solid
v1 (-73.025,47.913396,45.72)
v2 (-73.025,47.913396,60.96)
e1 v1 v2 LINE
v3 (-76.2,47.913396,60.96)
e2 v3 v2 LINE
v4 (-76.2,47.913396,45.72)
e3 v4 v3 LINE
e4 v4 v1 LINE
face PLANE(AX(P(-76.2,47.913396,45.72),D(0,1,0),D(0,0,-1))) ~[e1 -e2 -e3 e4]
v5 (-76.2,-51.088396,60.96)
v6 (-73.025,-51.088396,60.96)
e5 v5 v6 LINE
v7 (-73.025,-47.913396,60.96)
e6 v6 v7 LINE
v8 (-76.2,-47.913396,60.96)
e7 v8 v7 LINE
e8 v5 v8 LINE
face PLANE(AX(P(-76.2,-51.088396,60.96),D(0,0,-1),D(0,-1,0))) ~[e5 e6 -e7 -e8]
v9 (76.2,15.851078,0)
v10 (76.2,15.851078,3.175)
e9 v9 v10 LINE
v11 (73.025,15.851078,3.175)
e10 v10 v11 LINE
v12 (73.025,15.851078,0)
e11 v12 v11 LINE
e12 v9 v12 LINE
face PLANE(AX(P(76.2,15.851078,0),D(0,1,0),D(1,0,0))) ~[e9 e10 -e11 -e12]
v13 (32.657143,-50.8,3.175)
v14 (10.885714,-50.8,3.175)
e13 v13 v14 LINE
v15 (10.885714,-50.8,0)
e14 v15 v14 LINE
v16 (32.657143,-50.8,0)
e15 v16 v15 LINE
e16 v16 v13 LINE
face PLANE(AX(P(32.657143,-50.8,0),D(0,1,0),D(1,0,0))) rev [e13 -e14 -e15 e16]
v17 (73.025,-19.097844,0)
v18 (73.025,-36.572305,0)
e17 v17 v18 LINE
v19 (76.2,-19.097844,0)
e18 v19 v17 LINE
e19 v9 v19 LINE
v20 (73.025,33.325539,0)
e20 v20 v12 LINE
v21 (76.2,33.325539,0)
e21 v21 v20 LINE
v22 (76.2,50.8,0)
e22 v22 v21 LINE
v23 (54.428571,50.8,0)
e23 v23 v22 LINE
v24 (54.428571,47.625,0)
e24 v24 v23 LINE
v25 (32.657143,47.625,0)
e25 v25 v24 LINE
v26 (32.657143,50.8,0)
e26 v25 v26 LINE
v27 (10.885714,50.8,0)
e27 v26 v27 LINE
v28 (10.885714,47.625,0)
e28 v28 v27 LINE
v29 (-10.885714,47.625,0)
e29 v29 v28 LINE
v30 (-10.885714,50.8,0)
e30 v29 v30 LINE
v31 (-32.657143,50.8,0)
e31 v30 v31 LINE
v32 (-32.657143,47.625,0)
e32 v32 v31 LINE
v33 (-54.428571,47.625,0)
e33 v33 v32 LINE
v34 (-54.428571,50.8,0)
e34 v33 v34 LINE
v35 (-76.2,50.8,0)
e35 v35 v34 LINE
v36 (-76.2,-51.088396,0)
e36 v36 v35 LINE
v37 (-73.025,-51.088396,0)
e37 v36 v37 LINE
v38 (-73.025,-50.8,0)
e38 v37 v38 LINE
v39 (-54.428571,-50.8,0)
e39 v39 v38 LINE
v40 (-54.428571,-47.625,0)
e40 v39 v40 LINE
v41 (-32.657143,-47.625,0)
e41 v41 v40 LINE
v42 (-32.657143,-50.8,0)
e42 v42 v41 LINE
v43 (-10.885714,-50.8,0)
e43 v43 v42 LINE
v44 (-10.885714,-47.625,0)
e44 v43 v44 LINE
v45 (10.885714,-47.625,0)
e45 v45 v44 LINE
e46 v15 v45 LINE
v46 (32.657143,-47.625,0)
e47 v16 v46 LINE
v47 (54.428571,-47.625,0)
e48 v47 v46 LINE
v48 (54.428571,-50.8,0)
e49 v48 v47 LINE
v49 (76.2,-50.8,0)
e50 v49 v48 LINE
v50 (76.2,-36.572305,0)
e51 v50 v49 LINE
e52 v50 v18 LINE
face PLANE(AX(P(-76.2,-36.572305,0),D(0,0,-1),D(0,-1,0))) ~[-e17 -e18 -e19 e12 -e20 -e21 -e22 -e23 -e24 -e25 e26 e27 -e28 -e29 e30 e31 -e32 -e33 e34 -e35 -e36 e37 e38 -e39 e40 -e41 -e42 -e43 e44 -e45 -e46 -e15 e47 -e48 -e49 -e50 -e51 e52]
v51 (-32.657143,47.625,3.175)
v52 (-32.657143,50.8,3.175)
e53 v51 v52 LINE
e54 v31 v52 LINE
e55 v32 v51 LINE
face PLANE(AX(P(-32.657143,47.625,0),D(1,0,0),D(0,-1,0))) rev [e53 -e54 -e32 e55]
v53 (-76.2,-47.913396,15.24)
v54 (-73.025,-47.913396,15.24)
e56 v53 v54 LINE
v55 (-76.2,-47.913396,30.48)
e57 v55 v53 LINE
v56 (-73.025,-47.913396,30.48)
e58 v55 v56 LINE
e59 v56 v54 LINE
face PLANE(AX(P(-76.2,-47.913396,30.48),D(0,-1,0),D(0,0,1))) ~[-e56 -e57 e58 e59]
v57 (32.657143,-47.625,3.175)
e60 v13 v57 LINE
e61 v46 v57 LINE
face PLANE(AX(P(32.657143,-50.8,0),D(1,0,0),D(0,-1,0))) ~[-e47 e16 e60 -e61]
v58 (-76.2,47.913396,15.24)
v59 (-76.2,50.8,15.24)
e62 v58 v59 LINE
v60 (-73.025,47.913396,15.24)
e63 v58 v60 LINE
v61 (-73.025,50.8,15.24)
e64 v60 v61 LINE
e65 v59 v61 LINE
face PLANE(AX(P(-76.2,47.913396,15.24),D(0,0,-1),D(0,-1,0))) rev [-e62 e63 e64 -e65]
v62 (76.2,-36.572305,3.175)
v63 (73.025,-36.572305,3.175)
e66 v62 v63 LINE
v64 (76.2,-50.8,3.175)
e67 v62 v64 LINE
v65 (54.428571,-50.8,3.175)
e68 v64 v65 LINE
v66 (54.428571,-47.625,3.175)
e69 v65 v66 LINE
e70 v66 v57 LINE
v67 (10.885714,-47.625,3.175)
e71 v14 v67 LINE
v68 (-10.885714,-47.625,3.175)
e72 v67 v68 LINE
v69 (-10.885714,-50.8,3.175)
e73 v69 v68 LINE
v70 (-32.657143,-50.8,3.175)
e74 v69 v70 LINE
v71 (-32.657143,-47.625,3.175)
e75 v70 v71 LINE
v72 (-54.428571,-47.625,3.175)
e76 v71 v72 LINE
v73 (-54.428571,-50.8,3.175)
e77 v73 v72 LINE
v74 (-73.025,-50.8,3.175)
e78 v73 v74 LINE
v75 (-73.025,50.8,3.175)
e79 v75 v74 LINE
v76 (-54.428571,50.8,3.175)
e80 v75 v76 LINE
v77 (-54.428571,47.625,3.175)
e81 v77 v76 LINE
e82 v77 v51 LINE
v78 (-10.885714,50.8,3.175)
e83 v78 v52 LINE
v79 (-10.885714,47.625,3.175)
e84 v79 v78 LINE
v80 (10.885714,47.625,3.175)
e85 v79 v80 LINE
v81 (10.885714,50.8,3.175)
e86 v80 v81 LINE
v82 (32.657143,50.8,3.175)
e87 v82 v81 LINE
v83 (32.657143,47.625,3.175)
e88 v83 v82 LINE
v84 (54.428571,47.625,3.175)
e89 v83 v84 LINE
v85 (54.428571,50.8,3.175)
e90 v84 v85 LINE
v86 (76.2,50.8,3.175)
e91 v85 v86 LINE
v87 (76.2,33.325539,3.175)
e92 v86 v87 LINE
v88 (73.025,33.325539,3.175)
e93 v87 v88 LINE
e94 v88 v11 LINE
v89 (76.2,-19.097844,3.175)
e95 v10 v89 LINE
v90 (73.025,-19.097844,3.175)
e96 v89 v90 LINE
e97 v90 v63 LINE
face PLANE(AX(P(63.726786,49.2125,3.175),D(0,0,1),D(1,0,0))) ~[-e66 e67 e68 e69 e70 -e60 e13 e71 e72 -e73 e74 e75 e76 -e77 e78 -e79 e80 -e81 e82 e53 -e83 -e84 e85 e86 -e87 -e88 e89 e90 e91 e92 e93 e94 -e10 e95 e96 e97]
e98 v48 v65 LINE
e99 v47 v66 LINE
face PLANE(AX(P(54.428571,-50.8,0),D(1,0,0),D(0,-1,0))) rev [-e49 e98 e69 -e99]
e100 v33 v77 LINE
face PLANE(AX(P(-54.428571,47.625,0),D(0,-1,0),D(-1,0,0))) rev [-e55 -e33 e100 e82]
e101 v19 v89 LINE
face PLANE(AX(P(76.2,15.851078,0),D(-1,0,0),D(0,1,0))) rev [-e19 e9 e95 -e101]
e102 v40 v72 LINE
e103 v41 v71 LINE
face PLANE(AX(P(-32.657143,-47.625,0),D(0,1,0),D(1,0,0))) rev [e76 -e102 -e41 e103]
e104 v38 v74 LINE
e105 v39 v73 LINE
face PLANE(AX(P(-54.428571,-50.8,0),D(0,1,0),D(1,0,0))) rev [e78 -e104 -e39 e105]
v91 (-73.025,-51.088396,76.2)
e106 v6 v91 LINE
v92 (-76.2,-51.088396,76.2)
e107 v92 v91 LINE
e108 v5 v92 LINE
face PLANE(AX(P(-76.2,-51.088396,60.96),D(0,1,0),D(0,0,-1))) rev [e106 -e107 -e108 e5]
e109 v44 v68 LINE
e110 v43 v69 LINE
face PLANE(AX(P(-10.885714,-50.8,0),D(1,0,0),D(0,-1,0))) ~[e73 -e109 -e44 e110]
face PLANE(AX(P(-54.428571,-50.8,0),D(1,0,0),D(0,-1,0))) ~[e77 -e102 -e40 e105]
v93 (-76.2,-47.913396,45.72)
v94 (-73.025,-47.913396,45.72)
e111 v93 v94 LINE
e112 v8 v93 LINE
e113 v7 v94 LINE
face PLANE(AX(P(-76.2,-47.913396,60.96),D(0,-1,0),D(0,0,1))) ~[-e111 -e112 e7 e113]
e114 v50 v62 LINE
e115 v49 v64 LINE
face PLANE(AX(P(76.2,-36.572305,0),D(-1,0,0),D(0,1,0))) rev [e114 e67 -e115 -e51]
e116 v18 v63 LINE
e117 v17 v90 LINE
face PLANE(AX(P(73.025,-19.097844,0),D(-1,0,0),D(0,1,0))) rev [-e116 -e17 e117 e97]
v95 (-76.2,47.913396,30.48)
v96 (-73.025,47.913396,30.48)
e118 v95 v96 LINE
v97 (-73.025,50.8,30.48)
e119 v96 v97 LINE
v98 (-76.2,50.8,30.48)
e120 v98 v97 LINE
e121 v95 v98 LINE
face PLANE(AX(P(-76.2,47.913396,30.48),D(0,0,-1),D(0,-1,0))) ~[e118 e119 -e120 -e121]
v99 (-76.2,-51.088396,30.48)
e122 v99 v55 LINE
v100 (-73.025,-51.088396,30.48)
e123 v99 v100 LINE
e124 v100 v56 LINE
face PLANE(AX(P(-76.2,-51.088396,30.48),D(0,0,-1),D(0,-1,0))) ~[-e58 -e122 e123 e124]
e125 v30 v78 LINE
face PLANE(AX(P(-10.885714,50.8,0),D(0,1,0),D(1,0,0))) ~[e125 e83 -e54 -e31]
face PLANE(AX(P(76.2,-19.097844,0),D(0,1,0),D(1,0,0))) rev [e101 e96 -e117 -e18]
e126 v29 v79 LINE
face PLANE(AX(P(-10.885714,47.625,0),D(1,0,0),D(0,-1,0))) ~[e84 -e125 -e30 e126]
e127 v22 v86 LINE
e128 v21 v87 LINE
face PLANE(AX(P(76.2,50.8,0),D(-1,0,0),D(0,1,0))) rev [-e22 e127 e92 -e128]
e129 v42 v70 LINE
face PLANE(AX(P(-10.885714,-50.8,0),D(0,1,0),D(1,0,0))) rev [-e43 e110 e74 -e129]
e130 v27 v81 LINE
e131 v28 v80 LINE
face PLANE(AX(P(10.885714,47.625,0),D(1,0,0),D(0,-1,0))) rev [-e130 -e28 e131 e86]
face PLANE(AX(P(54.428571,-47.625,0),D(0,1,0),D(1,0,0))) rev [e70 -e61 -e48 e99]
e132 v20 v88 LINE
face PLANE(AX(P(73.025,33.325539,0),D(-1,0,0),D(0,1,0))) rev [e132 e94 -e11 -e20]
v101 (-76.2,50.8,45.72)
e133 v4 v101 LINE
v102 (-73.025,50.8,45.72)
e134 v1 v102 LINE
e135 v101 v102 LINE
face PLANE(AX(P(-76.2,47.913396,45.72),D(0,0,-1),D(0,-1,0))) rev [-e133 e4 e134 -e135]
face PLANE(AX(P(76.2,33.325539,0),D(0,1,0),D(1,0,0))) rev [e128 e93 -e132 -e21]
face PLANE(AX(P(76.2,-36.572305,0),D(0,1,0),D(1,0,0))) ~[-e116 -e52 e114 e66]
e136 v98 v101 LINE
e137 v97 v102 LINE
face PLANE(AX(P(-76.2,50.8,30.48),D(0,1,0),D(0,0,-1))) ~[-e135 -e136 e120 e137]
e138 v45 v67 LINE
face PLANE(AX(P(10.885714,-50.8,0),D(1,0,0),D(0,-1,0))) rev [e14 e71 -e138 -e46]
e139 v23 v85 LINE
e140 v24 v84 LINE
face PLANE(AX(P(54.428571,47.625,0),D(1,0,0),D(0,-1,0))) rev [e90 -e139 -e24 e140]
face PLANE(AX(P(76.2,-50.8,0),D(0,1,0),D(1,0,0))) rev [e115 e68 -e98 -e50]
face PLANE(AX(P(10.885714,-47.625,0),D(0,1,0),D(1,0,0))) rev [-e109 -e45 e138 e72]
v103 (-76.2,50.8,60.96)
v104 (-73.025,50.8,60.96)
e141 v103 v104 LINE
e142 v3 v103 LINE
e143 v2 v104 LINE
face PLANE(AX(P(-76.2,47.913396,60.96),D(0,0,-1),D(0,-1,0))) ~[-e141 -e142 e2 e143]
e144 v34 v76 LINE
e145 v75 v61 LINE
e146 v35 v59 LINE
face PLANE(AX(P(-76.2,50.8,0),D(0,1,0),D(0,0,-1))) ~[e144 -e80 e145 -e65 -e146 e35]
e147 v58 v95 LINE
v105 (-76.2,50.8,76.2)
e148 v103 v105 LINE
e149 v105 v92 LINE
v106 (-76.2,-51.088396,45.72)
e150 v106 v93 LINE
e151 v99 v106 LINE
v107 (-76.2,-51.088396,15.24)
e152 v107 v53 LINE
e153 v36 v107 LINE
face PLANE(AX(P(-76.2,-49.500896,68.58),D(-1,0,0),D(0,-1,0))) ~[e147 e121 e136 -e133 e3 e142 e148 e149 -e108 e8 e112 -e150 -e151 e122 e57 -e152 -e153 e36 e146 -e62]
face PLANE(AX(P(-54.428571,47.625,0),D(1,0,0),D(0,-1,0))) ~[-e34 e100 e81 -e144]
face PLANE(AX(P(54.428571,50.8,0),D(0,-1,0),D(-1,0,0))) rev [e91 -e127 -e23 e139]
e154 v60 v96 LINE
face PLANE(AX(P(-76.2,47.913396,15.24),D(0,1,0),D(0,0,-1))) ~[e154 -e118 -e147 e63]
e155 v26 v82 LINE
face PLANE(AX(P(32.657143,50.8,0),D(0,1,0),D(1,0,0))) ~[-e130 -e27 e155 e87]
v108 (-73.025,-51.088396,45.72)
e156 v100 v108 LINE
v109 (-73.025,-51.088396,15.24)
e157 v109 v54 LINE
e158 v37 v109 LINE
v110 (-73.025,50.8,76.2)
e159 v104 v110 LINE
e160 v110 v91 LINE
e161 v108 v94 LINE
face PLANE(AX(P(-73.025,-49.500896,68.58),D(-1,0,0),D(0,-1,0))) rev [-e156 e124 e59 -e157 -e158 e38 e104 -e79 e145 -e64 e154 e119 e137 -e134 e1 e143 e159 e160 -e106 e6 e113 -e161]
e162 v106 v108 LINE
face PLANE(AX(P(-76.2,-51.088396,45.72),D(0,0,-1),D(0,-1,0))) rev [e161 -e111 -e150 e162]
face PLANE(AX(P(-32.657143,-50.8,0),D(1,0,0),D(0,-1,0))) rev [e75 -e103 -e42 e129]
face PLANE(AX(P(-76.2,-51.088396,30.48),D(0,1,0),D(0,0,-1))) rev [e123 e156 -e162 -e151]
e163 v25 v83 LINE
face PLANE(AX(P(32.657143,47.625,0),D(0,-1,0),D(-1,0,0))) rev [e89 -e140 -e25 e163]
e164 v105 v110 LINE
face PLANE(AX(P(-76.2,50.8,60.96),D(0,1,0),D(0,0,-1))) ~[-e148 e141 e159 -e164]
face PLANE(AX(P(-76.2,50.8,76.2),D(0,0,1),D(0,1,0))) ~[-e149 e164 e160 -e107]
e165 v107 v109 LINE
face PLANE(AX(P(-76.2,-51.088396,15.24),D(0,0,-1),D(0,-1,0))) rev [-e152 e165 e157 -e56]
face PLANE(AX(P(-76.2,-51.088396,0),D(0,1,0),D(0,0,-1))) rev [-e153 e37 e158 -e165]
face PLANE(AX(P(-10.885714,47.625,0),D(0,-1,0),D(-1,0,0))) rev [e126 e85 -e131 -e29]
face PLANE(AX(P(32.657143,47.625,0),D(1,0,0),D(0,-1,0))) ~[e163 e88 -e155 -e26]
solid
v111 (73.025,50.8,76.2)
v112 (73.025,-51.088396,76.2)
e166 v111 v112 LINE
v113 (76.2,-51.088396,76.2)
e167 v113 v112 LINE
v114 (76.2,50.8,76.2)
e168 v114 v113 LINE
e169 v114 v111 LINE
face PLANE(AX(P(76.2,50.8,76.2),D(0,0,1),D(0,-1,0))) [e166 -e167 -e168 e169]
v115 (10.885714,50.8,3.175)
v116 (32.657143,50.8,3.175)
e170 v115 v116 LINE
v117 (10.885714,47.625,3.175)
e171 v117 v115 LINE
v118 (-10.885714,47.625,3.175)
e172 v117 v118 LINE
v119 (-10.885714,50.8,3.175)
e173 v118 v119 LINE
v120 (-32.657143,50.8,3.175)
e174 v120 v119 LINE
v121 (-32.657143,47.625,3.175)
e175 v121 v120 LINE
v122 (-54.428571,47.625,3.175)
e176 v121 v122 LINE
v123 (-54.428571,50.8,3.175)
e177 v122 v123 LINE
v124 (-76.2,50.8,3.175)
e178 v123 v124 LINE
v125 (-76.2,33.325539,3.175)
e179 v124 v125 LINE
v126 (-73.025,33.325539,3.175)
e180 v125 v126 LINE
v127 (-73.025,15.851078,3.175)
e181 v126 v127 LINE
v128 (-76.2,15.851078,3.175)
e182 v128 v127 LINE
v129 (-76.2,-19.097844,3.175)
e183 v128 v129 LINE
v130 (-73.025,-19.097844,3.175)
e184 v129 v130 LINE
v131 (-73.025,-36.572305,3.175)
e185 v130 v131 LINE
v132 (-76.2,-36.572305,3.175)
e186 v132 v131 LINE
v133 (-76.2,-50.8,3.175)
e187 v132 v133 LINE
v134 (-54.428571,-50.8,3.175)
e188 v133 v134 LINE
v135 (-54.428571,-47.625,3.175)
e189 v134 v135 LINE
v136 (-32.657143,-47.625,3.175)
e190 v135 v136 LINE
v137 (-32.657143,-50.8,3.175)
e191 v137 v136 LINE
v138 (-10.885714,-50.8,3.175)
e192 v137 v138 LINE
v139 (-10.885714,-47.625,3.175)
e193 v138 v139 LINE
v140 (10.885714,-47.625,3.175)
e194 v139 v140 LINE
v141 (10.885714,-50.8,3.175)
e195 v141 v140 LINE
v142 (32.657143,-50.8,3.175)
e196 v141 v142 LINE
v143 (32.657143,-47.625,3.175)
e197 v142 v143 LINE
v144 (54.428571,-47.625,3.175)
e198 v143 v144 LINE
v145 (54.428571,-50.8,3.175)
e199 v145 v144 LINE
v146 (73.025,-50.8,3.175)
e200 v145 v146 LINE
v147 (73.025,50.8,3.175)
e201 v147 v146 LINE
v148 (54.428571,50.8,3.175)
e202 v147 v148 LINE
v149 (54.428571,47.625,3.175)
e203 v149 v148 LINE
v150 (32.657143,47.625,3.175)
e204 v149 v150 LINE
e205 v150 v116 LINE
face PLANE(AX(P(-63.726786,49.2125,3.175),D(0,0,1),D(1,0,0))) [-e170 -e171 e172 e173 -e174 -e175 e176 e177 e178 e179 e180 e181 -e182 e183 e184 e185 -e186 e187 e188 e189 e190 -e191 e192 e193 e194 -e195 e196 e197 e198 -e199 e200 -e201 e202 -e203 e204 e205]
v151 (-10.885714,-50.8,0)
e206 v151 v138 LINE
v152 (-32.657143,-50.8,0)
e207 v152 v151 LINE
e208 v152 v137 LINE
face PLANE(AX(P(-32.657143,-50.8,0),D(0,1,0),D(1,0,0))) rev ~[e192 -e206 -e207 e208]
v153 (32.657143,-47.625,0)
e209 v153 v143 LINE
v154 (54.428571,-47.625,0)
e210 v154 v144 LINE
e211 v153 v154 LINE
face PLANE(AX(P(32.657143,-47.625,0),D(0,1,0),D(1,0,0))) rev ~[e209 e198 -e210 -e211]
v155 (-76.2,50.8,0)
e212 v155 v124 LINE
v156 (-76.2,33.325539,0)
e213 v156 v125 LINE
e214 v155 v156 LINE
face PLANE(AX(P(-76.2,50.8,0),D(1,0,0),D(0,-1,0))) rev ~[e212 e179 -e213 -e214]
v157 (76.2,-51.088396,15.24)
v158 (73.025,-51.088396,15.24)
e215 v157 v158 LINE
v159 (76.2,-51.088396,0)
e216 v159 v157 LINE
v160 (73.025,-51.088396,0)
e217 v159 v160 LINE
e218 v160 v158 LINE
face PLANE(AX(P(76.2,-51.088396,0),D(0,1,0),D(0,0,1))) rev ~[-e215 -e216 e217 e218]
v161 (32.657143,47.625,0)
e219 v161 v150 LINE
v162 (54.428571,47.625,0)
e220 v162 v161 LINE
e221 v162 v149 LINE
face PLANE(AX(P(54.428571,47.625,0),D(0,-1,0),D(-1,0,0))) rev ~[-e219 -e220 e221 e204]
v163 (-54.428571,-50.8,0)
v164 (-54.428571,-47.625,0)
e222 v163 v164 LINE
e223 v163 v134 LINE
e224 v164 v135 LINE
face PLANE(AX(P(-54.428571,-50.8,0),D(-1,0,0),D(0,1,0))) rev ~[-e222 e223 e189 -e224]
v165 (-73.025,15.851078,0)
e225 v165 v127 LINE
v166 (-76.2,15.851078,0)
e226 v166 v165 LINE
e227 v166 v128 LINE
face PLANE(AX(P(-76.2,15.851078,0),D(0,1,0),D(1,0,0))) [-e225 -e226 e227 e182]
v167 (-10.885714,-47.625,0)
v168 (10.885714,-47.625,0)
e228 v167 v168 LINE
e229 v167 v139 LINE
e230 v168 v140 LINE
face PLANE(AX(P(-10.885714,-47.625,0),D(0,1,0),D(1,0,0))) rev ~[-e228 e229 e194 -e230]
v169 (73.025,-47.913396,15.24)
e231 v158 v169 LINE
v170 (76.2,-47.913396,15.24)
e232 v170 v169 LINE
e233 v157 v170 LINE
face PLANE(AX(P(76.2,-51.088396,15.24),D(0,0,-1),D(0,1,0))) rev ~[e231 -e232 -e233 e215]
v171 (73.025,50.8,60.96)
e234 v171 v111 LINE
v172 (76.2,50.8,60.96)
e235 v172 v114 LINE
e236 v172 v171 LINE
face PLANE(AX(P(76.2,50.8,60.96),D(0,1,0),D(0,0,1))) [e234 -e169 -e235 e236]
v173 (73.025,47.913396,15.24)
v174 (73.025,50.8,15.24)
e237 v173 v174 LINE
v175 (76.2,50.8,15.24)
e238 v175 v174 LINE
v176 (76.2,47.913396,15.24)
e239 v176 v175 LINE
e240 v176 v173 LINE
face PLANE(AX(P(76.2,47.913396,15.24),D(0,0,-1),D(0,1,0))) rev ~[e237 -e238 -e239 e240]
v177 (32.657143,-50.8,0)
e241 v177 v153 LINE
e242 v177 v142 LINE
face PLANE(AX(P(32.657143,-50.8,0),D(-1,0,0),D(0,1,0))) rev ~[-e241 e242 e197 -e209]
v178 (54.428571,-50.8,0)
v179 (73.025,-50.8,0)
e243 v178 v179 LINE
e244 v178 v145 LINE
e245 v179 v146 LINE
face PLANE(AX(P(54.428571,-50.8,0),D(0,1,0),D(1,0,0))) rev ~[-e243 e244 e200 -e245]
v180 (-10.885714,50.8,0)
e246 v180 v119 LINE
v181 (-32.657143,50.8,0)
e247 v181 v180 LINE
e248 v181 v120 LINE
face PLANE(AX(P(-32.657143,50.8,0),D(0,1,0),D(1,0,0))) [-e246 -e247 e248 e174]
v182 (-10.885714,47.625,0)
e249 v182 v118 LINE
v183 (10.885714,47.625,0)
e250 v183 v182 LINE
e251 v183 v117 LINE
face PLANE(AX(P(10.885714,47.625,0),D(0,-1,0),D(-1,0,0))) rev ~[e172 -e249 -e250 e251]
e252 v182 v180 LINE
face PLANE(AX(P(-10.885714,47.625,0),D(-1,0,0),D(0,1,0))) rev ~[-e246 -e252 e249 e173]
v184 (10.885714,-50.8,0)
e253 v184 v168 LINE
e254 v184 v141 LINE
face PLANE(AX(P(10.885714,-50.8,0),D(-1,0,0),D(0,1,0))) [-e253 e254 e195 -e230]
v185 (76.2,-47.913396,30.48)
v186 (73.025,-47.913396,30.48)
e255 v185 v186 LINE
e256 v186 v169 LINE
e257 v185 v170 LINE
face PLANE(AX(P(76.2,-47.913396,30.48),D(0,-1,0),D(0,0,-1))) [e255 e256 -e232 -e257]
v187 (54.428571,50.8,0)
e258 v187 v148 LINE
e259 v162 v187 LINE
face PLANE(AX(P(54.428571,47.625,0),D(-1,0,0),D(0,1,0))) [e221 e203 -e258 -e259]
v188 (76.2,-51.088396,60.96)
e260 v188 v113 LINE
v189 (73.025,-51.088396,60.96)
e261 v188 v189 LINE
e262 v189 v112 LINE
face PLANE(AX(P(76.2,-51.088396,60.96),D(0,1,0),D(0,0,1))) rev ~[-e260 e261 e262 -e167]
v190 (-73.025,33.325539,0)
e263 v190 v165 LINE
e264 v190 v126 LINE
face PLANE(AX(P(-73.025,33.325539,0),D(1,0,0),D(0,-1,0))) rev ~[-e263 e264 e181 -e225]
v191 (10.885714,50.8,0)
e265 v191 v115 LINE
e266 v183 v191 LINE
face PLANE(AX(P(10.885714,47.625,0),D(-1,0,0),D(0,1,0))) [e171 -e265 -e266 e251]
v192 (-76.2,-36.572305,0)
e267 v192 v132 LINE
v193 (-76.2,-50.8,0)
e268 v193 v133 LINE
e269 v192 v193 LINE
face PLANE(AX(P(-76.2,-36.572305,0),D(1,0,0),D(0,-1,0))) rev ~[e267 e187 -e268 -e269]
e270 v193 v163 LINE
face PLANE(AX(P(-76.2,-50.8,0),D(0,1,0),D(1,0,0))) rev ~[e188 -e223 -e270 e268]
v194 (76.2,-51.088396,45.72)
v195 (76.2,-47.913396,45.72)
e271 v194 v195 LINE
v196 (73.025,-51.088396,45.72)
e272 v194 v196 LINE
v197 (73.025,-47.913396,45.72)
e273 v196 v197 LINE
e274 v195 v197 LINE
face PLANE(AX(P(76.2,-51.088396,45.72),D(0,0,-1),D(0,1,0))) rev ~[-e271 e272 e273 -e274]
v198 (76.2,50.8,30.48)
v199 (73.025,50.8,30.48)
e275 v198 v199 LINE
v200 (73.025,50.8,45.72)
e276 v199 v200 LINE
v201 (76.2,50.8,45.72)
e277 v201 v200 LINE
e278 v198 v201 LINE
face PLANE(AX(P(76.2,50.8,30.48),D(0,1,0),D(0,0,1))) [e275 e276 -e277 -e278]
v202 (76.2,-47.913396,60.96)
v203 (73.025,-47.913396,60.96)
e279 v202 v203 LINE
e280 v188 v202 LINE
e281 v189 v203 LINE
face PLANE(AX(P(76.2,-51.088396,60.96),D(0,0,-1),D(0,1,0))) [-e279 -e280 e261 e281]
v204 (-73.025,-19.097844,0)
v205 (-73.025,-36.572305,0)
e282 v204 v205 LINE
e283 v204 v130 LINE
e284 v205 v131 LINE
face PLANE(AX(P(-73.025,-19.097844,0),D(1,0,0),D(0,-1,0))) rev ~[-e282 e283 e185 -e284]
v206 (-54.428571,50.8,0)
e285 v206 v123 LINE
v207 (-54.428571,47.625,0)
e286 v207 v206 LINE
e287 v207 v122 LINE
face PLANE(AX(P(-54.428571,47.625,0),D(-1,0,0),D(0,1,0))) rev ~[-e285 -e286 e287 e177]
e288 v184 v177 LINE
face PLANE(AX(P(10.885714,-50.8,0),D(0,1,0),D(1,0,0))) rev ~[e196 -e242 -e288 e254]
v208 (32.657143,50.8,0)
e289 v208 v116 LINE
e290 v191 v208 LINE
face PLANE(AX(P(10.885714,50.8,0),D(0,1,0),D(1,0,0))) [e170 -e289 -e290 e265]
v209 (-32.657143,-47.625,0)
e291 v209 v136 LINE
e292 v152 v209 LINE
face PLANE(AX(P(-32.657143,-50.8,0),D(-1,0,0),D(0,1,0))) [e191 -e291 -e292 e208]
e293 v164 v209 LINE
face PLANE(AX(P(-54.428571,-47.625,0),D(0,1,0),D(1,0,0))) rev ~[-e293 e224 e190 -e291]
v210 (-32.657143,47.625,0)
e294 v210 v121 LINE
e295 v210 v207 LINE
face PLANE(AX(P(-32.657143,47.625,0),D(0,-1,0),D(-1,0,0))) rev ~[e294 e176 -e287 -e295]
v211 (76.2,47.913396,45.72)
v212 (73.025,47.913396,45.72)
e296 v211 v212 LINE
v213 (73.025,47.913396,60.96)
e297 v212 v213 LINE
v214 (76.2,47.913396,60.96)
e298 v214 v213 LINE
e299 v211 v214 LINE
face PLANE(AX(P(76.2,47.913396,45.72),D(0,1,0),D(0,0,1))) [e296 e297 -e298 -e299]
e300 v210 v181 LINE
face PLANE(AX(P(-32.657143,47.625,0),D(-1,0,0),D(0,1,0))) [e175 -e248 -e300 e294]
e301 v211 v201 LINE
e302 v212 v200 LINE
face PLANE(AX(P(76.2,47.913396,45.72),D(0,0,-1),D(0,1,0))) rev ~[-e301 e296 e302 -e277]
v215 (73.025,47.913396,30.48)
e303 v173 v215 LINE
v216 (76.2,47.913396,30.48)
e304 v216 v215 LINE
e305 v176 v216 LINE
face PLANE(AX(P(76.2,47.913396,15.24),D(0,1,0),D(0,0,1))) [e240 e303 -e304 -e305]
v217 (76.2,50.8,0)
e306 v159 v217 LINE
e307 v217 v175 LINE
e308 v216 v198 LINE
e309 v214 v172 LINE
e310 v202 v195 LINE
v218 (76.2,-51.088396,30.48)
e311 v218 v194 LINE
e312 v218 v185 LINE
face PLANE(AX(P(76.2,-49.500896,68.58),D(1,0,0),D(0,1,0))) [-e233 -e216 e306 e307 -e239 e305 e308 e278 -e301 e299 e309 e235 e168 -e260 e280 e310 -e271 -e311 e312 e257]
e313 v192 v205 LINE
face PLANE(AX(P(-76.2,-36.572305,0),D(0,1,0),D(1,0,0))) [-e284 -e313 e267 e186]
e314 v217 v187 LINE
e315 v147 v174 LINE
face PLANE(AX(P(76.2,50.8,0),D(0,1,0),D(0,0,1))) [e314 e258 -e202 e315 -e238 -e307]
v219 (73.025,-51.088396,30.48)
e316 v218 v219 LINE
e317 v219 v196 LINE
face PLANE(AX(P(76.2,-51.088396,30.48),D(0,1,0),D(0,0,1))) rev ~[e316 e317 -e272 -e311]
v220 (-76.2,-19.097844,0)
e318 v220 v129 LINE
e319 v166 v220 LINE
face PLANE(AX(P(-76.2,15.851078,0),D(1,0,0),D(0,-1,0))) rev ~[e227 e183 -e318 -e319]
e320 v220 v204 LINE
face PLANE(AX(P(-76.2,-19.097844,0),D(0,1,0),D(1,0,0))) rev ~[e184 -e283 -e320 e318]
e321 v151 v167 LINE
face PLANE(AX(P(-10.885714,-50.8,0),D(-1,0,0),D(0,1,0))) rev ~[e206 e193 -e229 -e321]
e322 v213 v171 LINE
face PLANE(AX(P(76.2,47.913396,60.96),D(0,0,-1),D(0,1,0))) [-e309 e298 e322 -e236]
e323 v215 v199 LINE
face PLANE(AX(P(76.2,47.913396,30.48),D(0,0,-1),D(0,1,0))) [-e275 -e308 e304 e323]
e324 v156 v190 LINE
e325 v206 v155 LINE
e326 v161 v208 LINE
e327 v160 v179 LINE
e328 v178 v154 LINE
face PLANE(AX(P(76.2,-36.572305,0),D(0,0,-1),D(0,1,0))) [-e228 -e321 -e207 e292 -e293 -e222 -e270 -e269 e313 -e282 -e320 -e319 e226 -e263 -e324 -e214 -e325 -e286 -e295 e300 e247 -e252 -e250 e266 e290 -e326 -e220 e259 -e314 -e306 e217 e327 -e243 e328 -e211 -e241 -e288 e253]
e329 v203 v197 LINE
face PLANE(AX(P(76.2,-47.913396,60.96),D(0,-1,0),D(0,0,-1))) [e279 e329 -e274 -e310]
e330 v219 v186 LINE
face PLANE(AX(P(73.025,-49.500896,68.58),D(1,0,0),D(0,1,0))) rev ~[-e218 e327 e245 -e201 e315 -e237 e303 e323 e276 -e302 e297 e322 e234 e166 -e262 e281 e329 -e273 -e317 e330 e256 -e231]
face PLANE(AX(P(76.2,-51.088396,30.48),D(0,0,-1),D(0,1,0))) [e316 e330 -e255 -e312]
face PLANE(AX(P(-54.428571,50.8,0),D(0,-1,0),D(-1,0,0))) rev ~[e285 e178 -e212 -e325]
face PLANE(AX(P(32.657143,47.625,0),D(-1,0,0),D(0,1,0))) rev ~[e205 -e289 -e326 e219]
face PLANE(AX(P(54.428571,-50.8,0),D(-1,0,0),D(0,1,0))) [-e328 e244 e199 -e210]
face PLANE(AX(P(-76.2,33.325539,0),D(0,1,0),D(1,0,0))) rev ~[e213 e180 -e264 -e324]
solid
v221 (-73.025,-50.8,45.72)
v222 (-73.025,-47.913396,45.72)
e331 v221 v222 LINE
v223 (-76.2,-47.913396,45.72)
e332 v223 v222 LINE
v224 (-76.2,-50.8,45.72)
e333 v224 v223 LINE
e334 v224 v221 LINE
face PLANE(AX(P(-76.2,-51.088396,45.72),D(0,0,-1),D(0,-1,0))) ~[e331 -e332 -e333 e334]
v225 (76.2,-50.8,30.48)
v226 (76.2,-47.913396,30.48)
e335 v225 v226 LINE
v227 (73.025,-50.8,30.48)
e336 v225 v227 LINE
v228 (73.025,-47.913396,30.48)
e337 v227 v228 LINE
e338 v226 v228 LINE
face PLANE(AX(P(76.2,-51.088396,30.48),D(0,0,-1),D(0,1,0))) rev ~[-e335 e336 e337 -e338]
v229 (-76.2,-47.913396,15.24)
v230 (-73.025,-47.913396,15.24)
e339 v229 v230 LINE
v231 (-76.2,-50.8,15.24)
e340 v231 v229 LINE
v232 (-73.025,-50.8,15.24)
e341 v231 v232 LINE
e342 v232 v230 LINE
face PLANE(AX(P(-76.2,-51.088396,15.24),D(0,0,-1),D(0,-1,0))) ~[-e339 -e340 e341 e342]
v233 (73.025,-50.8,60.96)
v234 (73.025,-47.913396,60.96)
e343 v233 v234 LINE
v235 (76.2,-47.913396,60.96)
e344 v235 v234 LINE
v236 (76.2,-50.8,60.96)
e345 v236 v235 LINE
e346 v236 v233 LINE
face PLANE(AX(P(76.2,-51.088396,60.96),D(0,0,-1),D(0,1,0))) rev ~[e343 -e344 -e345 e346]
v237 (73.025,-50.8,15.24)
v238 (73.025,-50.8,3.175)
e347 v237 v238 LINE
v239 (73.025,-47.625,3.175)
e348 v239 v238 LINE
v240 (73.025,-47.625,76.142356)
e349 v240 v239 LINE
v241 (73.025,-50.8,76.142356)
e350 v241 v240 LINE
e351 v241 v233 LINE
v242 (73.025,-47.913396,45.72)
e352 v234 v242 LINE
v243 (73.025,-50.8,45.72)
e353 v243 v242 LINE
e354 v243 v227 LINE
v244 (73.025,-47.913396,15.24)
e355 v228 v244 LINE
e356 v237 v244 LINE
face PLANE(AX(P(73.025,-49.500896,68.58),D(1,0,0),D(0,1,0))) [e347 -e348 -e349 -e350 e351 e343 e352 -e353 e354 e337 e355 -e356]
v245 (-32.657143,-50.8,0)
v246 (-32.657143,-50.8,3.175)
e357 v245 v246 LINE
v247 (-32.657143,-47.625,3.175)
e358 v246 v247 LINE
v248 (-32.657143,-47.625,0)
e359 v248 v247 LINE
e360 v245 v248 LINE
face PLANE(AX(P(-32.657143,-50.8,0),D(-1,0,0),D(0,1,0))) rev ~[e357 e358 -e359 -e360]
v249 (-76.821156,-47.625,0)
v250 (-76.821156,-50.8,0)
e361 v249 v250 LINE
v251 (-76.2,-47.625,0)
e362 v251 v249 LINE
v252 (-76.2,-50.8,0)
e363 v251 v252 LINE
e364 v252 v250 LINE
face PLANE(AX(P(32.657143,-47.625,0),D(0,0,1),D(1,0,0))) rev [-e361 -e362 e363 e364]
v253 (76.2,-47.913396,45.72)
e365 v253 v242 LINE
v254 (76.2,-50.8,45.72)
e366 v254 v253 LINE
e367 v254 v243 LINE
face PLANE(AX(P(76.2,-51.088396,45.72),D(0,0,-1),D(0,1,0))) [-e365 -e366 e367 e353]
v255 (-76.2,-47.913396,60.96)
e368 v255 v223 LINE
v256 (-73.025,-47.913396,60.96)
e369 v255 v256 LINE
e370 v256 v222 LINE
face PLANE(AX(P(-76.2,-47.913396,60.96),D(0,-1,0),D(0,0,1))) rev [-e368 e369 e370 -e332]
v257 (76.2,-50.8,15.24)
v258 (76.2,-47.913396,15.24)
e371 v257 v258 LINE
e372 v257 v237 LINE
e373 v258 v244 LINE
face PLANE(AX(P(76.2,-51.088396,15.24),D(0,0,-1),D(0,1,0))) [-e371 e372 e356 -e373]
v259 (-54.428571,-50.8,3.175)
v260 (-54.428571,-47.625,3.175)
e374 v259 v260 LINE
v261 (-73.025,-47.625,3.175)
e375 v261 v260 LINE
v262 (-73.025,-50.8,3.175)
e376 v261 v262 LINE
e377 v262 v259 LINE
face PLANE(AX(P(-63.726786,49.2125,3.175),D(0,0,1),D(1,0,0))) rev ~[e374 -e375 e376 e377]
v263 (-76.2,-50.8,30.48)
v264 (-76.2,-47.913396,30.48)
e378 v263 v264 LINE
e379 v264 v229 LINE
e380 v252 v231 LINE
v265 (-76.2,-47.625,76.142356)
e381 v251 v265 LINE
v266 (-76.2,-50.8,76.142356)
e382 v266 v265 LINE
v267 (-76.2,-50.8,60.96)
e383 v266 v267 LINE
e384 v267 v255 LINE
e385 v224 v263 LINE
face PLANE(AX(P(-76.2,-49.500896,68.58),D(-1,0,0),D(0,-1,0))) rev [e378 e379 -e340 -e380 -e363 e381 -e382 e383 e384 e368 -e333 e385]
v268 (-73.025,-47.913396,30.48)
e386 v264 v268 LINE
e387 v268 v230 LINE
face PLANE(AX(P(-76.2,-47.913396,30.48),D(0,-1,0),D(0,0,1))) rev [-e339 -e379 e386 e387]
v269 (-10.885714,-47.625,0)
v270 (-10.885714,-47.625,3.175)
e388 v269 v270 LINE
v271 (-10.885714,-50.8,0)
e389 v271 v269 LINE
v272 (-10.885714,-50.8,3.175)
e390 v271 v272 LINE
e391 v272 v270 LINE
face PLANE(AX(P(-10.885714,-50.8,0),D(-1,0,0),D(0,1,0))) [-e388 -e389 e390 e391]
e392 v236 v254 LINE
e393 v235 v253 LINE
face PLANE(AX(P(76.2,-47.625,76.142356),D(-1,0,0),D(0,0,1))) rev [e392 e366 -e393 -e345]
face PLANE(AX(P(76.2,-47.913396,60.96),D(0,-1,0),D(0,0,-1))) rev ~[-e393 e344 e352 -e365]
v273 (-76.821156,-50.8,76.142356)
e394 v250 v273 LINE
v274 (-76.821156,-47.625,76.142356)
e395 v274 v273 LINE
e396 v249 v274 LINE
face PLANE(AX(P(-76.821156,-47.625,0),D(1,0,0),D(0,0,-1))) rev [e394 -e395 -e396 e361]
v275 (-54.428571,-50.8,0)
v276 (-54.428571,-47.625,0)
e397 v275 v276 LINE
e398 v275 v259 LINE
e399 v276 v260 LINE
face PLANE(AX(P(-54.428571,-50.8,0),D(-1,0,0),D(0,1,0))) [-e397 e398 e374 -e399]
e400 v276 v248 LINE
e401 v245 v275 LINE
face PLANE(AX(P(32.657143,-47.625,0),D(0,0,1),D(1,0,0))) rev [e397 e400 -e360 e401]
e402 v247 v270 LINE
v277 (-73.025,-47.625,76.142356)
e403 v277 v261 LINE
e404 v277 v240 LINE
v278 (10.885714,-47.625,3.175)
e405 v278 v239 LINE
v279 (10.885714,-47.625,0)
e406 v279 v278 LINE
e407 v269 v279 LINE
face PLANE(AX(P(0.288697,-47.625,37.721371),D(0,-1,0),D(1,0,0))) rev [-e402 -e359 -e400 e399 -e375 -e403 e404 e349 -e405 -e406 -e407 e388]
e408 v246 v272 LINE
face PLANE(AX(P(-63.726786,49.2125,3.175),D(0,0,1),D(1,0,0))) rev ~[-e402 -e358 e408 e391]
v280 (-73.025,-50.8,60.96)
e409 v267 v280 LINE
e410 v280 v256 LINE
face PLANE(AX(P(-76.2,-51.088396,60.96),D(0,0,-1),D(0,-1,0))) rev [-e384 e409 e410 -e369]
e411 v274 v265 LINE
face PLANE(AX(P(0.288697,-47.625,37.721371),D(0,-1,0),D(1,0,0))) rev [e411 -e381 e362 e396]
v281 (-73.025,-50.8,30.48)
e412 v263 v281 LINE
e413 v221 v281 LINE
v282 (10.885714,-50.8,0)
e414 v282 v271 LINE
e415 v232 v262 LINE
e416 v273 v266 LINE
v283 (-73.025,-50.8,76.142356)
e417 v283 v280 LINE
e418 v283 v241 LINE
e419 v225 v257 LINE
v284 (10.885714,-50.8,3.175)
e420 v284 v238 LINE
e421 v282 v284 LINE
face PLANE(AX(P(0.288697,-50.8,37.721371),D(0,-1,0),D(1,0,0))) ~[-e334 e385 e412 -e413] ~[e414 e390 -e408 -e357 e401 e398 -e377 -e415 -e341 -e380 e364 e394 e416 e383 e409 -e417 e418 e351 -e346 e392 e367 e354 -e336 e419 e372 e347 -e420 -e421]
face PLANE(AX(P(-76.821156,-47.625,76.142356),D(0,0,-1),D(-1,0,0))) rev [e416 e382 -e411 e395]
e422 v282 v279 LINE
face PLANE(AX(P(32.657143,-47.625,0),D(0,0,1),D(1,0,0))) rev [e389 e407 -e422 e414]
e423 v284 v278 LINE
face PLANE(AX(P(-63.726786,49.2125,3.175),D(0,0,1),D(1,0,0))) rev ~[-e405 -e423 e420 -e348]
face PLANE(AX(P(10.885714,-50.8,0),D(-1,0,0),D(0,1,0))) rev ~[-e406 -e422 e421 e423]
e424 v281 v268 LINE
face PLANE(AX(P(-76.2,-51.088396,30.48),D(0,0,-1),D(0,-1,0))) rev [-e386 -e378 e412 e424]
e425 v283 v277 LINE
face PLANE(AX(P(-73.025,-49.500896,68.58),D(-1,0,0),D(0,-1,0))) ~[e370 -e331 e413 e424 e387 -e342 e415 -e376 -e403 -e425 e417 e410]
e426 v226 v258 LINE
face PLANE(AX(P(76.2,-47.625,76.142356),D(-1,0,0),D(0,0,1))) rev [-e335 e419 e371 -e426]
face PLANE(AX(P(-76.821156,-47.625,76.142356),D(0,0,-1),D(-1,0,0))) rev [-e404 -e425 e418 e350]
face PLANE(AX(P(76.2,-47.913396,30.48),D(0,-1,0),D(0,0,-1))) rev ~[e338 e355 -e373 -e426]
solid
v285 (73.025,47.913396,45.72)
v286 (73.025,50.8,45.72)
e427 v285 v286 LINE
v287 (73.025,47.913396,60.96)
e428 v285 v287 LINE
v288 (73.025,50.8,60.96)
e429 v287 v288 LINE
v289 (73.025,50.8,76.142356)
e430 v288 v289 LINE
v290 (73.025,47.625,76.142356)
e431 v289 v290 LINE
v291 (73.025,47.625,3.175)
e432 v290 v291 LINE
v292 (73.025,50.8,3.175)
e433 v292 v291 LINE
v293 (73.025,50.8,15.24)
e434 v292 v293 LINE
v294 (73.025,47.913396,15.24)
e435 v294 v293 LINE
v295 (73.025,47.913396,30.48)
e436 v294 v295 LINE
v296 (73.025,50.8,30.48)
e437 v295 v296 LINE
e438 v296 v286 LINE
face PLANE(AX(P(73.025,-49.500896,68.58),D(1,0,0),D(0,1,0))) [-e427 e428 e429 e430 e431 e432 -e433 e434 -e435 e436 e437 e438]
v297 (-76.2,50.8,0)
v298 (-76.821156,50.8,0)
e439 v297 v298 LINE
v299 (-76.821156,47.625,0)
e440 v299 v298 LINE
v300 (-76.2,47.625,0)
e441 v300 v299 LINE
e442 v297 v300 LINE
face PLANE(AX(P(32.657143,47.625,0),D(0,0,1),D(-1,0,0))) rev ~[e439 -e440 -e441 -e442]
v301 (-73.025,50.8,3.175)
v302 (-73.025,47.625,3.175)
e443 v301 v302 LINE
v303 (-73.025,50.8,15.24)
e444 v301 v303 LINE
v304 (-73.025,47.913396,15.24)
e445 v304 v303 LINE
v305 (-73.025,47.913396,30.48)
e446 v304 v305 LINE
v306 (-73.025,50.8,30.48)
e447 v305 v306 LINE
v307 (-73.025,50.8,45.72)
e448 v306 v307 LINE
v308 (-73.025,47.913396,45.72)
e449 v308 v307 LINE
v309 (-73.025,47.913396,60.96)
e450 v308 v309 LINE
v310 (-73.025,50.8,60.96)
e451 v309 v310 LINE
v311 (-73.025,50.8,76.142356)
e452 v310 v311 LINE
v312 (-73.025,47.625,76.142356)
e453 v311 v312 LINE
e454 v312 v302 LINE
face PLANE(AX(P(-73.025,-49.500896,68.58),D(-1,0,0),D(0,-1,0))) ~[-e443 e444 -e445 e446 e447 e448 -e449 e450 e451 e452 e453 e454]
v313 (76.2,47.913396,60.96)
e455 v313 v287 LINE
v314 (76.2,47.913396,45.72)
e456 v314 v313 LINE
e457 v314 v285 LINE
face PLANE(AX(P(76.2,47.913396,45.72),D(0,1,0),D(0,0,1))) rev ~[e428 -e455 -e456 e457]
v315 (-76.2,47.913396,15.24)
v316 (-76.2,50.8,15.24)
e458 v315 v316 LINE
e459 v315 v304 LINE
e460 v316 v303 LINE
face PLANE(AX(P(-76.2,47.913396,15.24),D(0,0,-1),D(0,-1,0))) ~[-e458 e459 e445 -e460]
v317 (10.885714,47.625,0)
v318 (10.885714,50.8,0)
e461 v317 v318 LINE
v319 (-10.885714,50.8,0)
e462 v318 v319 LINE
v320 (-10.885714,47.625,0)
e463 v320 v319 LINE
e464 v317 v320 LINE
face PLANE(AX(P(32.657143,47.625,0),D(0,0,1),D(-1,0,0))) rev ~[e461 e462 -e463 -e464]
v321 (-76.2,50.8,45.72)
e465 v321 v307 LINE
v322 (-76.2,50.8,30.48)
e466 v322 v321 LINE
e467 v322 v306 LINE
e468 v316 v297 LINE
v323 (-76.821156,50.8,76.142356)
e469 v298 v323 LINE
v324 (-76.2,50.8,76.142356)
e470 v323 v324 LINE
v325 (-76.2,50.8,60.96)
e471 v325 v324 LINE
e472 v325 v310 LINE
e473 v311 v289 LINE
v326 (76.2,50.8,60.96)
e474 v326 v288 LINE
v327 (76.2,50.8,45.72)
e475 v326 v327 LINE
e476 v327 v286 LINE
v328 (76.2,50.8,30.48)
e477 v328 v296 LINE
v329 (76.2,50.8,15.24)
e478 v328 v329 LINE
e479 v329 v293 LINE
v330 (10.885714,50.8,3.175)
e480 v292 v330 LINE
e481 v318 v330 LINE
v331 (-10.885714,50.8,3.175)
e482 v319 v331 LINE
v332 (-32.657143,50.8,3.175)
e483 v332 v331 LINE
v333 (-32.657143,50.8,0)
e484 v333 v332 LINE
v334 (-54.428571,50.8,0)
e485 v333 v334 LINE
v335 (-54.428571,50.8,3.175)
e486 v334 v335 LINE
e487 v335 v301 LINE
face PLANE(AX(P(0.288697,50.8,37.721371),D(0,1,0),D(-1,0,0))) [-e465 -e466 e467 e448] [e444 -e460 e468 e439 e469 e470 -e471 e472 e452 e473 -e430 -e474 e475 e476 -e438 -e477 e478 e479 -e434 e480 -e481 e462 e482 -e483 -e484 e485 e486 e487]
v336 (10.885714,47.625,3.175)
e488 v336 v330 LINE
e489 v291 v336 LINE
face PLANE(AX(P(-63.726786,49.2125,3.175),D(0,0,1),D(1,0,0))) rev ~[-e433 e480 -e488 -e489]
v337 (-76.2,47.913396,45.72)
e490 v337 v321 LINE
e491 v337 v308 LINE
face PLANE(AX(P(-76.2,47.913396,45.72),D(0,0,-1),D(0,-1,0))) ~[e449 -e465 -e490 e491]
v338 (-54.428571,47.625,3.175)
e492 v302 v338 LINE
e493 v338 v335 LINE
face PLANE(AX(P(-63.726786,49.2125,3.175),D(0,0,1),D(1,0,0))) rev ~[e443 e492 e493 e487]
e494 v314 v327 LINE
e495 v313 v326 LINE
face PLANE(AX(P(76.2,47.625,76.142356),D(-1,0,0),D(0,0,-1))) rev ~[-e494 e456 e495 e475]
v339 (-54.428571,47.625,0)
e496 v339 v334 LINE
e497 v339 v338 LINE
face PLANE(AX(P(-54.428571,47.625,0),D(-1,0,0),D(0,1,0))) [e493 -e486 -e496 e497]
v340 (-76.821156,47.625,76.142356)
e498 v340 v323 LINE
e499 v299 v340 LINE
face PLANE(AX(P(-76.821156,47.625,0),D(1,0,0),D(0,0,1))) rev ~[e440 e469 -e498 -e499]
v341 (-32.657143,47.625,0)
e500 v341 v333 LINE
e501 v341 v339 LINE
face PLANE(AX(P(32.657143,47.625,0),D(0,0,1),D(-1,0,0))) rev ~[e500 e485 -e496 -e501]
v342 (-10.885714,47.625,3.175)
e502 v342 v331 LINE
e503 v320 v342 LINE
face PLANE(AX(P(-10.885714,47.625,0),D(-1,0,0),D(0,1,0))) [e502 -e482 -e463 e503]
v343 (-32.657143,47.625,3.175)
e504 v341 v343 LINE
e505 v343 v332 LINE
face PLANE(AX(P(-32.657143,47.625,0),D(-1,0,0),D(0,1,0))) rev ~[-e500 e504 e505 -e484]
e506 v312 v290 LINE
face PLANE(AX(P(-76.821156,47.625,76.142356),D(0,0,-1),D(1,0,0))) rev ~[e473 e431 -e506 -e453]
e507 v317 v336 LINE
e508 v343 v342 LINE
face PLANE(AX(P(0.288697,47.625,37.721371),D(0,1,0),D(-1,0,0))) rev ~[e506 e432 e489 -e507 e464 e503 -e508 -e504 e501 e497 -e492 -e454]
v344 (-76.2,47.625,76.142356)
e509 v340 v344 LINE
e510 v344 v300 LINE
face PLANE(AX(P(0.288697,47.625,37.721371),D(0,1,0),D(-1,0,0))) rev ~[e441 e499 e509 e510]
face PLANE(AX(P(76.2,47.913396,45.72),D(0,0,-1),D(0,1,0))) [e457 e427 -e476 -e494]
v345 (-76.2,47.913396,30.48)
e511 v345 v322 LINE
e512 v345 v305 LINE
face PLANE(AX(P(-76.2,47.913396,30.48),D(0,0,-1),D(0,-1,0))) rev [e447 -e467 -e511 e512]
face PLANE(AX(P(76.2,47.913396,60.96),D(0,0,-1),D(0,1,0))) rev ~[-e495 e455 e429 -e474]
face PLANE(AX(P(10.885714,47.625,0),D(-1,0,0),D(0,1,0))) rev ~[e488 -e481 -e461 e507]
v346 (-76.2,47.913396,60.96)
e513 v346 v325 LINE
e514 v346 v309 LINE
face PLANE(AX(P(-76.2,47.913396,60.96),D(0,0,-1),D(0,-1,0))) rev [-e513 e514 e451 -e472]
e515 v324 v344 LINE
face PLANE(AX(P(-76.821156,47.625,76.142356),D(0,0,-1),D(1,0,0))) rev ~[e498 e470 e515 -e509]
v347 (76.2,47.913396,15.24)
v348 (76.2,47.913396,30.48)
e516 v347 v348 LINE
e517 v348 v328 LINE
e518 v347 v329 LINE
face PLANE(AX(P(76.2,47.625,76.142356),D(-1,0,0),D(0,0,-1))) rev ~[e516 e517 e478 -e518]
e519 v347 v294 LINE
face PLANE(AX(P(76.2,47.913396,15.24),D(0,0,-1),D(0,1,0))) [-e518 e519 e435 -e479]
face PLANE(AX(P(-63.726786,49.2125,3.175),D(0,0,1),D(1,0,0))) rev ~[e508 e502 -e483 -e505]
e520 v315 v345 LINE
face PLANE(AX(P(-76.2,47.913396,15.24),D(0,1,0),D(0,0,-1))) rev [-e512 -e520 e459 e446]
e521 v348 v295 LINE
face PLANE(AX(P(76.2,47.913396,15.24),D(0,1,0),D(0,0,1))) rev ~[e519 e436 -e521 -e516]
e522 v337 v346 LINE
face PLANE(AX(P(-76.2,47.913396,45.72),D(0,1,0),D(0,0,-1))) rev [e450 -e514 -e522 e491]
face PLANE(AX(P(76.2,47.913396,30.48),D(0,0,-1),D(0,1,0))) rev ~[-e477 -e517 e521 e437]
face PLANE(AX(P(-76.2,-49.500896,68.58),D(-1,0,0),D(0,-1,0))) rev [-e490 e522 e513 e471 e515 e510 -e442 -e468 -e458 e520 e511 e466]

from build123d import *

# Parameters (mm, degrees)
F0_W     = 18.5964285714
F0_H     = 3.175
F0_W_2   = 3.175
F0_H_2   = 14.2994610153
F0_H_3   = 17.4744610153
F0_H_4   = 11.0526949236
F0_W_3   = 21.7714285714
F1_DEPTH = 3.175
F2_W     = 3.175
F2_H     = 15.24
F2_W_2   = 2.8866035402
F3_DEPTH = 3.175
F6_DEPTH = 3.175


with BuildPart() as f1:
    # F0 (on Top) → F1 (new body)
    with BuildSketch(Plane.XY):
        with Locations((-63.7267857143, 49.2125)):
            Rectangle(F0_W, F0_H)
        with Locations((-74.6125, 49.2125)):
            Rectangle(F0_W_2, F0_H)
        with Locations((-74.6125, 40.4752694924)):
            Rectangle(F0_W_2, F0_H_2)
        with Locations((-74.6125, 7.1138474618)):
            Rectangle(F0_W_2, F0_H_3)
        with Locations((-74.6125, -10.3606135535)):
            Rectangle(F0_W_2, F0_H_3)
        with Locations((-74.6125, -42.0986525382)):
            Rectangle(F0_W_2, F0_H_4)
        with Locations((-74.6125, -49.2125)):
            Rectangle(F0_W_2, F0_H)
        with Locations((-63.7267857143, -49.2125)):
            Rectangle(F0_W, F0_H)
        with Locations((-21.7714285714, -49.2125)):
            Rectangle(F0_W_3, F0_H)
        with Locations((21.7714285714, -49.2125)):
            Rectangle(F0_W_3, F0_H)
        with Locations((63.7267857143, -49.2125)):
            Rectangle(F0_W, F0_H)
        with Locations((74.6125, -42.0986525382)):
            Rectangle(F0_W_2, F0_H_4)
        with Locations((74.6125, -10.3606135535)):
            Rectangle(F0_W_2, F0_H_3)
        with Locations((74.6125, 7.1138474618)):
            Rectangle(F0_W_2, F0_H_3)
        with Locations((74.6125, 40.4752694924)):
            Rectangle(F0_W_2, F0_H_2)
        with Locations((74.6125, 49.2125)):
            Rectangle(F0_W_2, F0_H)
        with Locations((63.7267857143, 49.2125)):
            Rectangle(F0_W, F0_H)
        with Locations((21.7714285714, 49.2125)):
            Rectangle(F0_W_3, F0_H)
        with Locations((-21.7714285714, 49.2125)):
            Rectangle(F0_W_3, F0_H)
        Polygon((73.025, 33.3255389847), (73.025, 47.625), (54.4285714286, 47.625), (32.6571428571, 47.625), (10.8857142857, 47.625), (-10.8857142857, 47.625), (-32.6571428571, 47.625), (-54.4285714286, 47.625), (-73.025, 47.625), (-73.025, 33.3255389847), (-73.025, 15.8510779694), (-73.025, -1.6233830458), (-73.025, -19.0978440611), (-73.025, -36.5723050764), (-73.025, -47.625), (-54.4285714286, -47.625), (-32.6571428571, -47.625), (-10.8857142857, -47.625), (10.8857142857, -47.625), (32.6571428571, -47.625), (54.4285714286, -47.625), (73.025, -47.625), (73.025, -36.5723050764), (73.025, -19.0978440611), (73.025, -1.6233830458), (73.025, 15.8510779694), align=None)
    extrude(amount=F1_DEPTH)

    # F2 (on face) → F3 (join)
    with BuildSketch(Plane.YZ.offset(76.2)):
        with Locations((-49.5008964598, 68.58)):
            Rectangle(F2_W, F2_H)
        with Locations((-49.5008964598, 38.1)):
            Rectangle(F2_W, F2_H)
        with Locations((-49.5008964598, 7.62)):
            Rectangle(F2_W, F2_H)
        with Locations((49.3566982299, 38.1)):
            Rectangle(F2_W_2, F2_H)
        with Locations((49.3566982299, 7.62)):
            Rectangle(F2_W_2, F2_H)
        with Locations((49.3566982299, 68.58)):
            Rectangle(F2_W_2, F2_H)
        Polygon((-36.5723050764, 0), (47.9133964598, 0), (47.9133964598, 15.24), (47.9133964598, 30.48), (47.9133964598, 45.72), (47.9133964598, 60.96), (47.9133964598, 76.2), (-47.9133964598, 76.2), (-47.9133964598, 60.96), (-47.9133964598, 45.72), (-47.9133964598, 30.48), (-47.9133964598, 15.24), (-47.9133964598, 0), (-47.625, 0), (-47.625, 3.175), (-36.5723050764, 3.175), align=None)
    extrude(amount=-F3_DEPTH)


with BuildPart() as f4_1:
    # F4: instance of F1
    add(f1.part.mirror(Plane.YZ))


with BuildPart() as f6:
    # F5 (on face) → F6 (new body)
    with BuildSketch(Plane(origin=(0, 47.625, 0), x_dir=(-1, 0, 0), z_dir=(0, 1, 0))):
        Polygon((-76.2, 76.1423557997), (-76.2, 0), (-54.4285714286, 0), (-54.4285714286, 3.175), (-32.6571428571, 3.175), (-32.6571428571, 0), (76.8211558461, 0), (76.8211558461, 76.1423557997), align=None)
    extrude(amount=F6_DEPTH)


with BuildPart() as f7_1:
    # F7: instance of F6
    add(f6.part.mirror(Plane.XZ))

    # F8: cut F1, F4_1
    add(f1.part, mode=Mode.SUBTRACT)
    add(f4_1.part, mode=Mode.SUBTRACT)


with BuildPart() as f6_1:
    add(f6.part)

    # F8: cut F1, F4_1
    add(f1.part, mode=Mode.SUBTRACT)
    add(f4_1.part, mode=Mode.SUBTRACT)


solid = Compound([f1.part, f4_1.part, f7_1.part, f6_1.part])
